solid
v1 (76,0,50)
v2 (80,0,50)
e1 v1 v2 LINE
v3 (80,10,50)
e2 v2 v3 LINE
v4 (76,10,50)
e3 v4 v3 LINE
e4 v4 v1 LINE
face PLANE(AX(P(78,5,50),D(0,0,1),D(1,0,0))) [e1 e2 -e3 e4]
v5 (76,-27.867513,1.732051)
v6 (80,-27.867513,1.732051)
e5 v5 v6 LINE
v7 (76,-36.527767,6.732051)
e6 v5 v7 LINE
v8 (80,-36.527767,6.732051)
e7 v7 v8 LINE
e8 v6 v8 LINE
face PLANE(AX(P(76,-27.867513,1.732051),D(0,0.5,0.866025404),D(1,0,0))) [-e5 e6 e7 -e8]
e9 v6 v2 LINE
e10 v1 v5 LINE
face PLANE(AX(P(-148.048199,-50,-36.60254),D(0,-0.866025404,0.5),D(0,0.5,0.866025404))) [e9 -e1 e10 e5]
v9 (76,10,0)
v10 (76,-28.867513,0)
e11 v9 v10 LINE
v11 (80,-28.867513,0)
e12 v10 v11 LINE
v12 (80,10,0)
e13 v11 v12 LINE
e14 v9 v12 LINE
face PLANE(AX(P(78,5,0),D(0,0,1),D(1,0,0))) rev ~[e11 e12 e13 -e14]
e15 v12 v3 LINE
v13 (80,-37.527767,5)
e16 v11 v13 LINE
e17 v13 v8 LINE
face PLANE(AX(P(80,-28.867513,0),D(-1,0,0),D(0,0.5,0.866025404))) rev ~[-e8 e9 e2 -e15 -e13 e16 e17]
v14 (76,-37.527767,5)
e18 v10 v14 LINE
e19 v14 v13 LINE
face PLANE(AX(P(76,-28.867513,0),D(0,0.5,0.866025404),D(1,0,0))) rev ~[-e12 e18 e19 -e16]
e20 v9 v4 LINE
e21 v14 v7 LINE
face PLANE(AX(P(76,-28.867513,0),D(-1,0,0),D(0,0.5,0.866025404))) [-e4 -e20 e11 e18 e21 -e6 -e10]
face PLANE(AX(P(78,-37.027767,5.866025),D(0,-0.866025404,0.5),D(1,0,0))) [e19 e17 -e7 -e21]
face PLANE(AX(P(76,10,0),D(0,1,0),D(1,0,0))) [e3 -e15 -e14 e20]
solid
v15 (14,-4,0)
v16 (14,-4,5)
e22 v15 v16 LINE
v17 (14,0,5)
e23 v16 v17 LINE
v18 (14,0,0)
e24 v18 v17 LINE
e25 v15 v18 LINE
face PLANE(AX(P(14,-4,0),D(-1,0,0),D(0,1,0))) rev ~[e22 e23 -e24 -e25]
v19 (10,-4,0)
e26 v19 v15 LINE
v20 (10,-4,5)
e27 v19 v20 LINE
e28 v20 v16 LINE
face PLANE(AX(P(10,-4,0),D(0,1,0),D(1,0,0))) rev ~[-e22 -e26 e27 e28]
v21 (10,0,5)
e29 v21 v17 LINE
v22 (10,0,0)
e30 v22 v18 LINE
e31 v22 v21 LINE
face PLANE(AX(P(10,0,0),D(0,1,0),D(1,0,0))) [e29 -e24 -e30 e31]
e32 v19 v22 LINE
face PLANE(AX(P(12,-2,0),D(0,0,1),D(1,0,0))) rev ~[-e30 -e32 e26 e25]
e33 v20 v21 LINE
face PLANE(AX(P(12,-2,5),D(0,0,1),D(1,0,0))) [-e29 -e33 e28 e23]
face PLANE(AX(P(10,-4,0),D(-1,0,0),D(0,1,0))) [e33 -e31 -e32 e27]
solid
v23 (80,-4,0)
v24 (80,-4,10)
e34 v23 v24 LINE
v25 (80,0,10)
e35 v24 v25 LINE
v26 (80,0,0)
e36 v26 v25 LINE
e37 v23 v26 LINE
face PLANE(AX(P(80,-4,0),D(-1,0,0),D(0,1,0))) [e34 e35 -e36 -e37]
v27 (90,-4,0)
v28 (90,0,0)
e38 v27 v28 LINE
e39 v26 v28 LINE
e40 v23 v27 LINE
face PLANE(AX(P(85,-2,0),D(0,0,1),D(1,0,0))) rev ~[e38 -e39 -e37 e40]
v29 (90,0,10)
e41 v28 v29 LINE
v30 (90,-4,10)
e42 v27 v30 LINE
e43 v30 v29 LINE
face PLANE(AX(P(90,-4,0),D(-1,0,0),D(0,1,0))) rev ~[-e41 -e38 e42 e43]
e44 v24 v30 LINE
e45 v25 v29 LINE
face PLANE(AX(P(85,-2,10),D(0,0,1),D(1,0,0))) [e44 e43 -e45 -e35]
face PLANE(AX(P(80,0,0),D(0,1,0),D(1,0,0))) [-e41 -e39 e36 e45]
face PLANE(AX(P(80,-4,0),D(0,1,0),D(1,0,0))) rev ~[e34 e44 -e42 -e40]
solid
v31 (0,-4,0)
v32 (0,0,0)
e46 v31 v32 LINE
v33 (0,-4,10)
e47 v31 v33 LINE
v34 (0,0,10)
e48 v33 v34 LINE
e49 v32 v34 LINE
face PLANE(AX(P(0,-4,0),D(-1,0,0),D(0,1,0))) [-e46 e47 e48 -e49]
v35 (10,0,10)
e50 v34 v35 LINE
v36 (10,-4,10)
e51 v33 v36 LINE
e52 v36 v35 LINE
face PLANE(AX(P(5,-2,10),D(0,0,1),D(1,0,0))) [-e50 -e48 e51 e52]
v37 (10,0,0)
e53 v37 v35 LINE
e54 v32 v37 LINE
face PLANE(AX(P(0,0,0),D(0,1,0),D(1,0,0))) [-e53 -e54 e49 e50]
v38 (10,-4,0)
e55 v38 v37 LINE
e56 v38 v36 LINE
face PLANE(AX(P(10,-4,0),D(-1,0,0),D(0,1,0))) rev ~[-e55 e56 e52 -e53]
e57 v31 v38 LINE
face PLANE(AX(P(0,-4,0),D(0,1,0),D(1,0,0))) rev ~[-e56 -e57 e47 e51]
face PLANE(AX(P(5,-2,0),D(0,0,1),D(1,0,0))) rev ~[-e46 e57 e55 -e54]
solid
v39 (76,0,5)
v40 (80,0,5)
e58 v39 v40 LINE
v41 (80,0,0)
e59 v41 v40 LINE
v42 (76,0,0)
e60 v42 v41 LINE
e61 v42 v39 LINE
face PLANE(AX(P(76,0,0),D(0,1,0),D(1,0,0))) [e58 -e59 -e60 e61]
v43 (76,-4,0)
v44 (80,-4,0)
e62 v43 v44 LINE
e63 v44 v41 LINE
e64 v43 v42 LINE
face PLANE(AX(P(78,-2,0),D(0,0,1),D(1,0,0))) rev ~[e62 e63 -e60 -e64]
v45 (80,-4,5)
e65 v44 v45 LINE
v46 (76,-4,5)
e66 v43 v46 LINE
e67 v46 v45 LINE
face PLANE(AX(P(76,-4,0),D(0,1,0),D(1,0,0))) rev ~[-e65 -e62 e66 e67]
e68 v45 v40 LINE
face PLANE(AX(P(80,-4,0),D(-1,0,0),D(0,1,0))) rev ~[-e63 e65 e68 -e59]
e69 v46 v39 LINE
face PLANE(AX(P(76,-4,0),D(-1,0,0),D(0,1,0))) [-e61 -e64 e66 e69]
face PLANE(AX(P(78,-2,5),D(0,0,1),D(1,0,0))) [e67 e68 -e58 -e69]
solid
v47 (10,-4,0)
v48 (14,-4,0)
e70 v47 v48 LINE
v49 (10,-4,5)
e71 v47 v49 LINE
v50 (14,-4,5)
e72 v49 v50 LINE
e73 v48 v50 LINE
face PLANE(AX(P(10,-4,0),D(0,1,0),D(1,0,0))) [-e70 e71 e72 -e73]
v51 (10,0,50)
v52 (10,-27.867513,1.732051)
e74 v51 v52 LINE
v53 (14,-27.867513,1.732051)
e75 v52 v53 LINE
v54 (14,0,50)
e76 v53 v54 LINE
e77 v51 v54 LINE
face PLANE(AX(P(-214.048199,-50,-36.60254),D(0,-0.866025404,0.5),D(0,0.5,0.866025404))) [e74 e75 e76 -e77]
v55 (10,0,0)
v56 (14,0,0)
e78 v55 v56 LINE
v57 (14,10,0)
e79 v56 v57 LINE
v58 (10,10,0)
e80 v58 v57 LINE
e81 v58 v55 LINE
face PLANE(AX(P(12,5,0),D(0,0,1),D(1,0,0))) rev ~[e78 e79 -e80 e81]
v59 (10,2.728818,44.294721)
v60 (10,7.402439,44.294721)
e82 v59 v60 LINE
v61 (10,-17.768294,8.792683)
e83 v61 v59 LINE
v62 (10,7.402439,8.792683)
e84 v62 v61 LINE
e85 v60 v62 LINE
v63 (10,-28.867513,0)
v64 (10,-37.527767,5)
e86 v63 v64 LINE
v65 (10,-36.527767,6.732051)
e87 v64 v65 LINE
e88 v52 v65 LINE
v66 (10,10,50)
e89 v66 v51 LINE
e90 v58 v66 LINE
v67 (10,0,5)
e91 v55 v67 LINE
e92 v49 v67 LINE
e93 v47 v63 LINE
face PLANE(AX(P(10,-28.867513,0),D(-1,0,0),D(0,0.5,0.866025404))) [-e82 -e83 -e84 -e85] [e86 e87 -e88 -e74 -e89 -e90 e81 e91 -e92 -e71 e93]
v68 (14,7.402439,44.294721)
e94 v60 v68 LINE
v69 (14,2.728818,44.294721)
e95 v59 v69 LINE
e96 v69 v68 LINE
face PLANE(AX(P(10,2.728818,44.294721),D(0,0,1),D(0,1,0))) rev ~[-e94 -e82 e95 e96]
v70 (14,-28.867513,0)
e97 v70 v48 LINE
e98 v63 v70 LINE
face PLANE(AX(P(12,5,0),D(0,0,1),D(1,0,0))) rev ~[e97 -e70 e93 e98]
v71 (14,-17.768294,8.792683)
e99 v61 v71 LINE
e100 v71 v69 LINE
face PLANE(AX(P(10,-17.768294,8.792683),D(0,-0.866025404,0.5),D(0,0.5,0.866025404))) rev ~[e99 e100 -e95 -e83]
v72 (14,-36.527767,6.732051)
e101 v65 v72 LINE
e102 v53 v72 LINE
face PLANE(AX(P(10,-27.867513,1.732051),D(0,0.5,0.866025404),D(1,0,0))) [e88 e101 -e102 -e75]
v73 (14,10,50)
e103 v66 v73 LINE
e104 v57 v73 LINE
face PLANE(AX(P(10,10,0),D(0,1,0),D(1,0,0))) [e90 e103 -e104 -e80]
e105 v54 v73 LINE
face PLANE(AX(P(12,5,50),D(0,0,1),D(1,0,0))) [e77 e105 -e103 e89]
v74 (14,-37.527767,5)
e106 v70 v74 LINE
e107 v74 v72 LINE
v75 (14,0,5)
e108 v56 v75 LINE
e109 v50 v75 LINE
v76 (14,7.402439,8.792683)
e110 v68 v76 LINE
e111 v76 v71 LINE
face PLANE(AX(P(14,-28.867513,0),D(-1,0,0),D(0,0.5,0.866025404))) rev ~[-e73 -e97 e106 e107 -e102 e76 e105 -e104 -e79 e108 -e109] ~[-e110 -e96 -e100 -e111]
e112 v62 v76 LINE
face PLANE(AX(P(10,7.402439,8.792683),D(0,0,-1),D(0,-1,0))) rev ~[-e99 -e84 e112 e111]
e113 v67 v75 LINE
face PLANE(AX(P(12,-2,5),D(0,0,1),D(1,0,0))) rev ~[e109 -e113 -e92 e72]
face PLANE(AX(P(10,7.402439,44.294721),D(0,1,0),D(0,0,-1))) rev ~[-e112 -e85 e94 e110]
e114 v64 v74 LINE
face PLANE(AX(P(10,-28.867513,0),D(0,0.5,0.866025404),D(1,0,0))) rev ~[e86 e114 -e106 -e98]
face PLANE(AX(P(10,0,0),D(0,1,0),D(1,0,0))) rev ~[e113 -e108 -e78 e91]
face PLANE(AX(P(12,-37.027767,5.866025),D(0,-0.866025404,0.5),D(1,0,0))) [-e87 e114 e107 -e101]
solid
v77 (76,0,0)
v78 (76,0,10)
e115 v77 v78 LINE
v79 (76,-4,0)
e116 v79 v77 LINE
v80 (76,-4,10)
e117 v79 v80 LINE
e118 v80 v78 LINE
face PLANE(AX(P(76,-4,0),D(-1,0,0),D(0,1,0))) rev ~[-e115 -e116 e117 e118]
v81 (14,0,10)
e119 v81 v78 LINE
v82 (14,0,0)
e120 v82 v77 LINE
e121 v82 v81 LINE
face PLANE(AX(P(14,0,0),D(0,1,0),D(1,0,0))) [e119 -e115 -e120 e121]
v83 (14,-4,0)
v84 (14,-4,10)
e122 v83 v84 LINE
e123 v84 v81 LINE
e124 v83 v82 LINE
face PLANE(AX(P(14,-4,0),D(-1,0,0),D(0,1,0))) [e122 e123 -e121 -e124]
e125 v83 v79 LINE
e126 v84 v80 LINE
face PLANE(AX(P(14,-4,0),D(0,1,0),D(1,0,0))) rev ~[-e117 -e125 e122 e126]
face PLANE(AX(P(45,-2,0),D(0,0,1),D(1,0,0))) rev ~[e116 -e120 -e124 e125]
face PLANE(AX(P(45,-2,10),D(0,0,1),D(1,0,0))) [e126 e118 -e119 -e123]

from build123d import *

# Parameters (mm, degrees)
F0_W          = 10
F0_H          = 4
F1_DEPTH      = 10
F0_W_2        = 62
F0_W_3        = 4
F0_H_2        = 10
F0_H_3        = 46
F2_DEPTH      = 50
F3_T1_DEPTH   = 452.0963970585
F3_2_T1_DEPTH = 452.0963970585
F4_W          = 4
F4_H          = 2
F5_DEPTH      = 10
F6_W          = 4
F6_H          = 2
F7_DEPTH      = 10
F8_DEPTH      = 5
F9_DEPTH      = 5
F11_DEPTH     = 25


# Not quite as in the source:
# - a fillet or chamfer that OpenCascade refuses, or shapes differently, is made with other operations: its cross-section is extruded or revolved along the edge and cut away or added


with BuildPart() as f1:
    # F0 (on Top) → F1 (new body)
    with BuildSketch(Plane.XY):
        with Locations((5, -2)):
            Rectangle(F0_W, F0_H)
    extrude(amount=F1_DEPTH)


with BuildPart() as f1b:
    # F0 (on Top) → F1, piece 2 (new body)
    with BuildSketch(Plane.XY):
        with Locations((45, -2)):
            Rectangle(F0_W_2, F0_H)
    extrude(amount=F1_DEPTH)


with BuildPart() as f1c:
    # F0 (on Top) → F1, piece 3 (new body)
    with BuildSketch(Plane.XY):
        with Locations((85, -2)):
            Rectangle(F0_W, F0_H)
    extrude(amount=F1_DEPTH)


with BuildPart() as f2:
    # F0 (on Top) → F2 (new body)
    with BuildSketch(Plane.XY):
        with Locations((12, 5)):
            Rectangle(F0_W_3, F0_H_2)
        with Locations((12, -2)):
            Rectangle(F0_W_3, F0_H)
        with Locations((12, -27)):
            Rectangle(F0_W_3, F0_H_3)
    extrude(amount=F2_DEPTH)

    # F3: chamfer of 50 x 86.6025403784 on 1 edges, made by hand

    # F3_s2 → F3_t1 (cut)
    with BuildSketch(Plane.YZ.offset(-214.0481985292)):
        Polygon((-50, -36.6025403784), (0, 50), (-50, 50), align=None)
    extrude(amount=F3_T1_DEPTH, mode=Mode.SUBTRACT)

    # F4 (on face) → F5 (join)
    with BuildSketch(Plane(origin=(0, -21.6506350946, 12.5), x_dir=(1, 0, 0), z_dir=(0, -0.8660254038, 0.5))):
        with Locations((12, -13.4337567297)):
            Rectangle(F4_W, F4_H)
    extrude(amount=F5_DEPTH)

    # F0 (on Top) → F9 (cut)
    with BuildSketch(Plane.XY):
        with Locations((12, -2)):
            Rectangle(F0_W_3, F0_H)
    extrude(amount=F9_DEPTH, mode=Mode.SUBTRACT)

    # F10 (on face) → F11 (cut)
    with BuildSketch(Plane(origin=(10, 0, 0), x_dir=(0, -1, 0), z_dir=(-1, 0, 0))):
        Polygon((-7.4024386704, 44.2947206634), (-7.4024386704, 8.7926825508), (17.7682936192, 8.7926825508), (-2.7288176419, 44.2947206634), align=None)
    extrude(amount=-F11_DEPTH, mode=Mode.SUBTRACT)


with BuildPart() as f2b:
    # F0 (on Top) → F2, piece 2 (new body)
    with BuildSketch(Plane.XY):
        with Locations((78, 5)):
            Rectangle(F0_W_3, F0_H_2)
        with Locations((78, -2)):
            Rectangle(F0_W_3, F0_H)
        with Locations((78, -27)):
            Rectangle(F0_W_3, F0_H_3)
    extrude(amount=F2_DEPTH)

    # F3#2: chamfer of 50 x 86.6025403784 on 1 edges, made by hand

    # F3_2_s2 → F3_2_t1 (cut)
    with BuildSketch(Plane.YZ.offset(-148.0481985292)):
        Polygon((-50, -36.6025403784), (0, 50), (-50, 50), align=None)
    extrude(amount=F3_2_T1_DEPTH, mode=Mode.SUBTRACT)

    # F6 (on face) → F7 (join)
    with BuildSketch(Plane(origin=(0, -21.6506350946, 12.5), x_dir=(1, 0, 0), z_dir=(0, -0.8660254038, 0.5))):
        with Locations((78, -13.4337567297)):
            Rectangle(F6_W, F6_H)
    extrude(amount=F7_DEPTH)


with BuildPart() as f8:
    # F0 (on Top) → F8 (new body)
    with BuildSketch(Plane.XY):
        with Locations((12, -2)):
            Rectangle(F0_W_3, F0_H)
    extrude(amount=F8_DEPTH)


with BuildPart() as f8b:
    # F0 (on Top) → F8, piece 2 (new body)
    with BuildSketch(Plane.XY):
        with Locations((78, -2)):
            Rectangle(F0_W_3, F0_H)
    extrude(amount=F8_DEPTH)


solid = Compound([f1.part, f1b.part, f1c.part, f2.part, f2b.part, f8.part, f8b.part])
